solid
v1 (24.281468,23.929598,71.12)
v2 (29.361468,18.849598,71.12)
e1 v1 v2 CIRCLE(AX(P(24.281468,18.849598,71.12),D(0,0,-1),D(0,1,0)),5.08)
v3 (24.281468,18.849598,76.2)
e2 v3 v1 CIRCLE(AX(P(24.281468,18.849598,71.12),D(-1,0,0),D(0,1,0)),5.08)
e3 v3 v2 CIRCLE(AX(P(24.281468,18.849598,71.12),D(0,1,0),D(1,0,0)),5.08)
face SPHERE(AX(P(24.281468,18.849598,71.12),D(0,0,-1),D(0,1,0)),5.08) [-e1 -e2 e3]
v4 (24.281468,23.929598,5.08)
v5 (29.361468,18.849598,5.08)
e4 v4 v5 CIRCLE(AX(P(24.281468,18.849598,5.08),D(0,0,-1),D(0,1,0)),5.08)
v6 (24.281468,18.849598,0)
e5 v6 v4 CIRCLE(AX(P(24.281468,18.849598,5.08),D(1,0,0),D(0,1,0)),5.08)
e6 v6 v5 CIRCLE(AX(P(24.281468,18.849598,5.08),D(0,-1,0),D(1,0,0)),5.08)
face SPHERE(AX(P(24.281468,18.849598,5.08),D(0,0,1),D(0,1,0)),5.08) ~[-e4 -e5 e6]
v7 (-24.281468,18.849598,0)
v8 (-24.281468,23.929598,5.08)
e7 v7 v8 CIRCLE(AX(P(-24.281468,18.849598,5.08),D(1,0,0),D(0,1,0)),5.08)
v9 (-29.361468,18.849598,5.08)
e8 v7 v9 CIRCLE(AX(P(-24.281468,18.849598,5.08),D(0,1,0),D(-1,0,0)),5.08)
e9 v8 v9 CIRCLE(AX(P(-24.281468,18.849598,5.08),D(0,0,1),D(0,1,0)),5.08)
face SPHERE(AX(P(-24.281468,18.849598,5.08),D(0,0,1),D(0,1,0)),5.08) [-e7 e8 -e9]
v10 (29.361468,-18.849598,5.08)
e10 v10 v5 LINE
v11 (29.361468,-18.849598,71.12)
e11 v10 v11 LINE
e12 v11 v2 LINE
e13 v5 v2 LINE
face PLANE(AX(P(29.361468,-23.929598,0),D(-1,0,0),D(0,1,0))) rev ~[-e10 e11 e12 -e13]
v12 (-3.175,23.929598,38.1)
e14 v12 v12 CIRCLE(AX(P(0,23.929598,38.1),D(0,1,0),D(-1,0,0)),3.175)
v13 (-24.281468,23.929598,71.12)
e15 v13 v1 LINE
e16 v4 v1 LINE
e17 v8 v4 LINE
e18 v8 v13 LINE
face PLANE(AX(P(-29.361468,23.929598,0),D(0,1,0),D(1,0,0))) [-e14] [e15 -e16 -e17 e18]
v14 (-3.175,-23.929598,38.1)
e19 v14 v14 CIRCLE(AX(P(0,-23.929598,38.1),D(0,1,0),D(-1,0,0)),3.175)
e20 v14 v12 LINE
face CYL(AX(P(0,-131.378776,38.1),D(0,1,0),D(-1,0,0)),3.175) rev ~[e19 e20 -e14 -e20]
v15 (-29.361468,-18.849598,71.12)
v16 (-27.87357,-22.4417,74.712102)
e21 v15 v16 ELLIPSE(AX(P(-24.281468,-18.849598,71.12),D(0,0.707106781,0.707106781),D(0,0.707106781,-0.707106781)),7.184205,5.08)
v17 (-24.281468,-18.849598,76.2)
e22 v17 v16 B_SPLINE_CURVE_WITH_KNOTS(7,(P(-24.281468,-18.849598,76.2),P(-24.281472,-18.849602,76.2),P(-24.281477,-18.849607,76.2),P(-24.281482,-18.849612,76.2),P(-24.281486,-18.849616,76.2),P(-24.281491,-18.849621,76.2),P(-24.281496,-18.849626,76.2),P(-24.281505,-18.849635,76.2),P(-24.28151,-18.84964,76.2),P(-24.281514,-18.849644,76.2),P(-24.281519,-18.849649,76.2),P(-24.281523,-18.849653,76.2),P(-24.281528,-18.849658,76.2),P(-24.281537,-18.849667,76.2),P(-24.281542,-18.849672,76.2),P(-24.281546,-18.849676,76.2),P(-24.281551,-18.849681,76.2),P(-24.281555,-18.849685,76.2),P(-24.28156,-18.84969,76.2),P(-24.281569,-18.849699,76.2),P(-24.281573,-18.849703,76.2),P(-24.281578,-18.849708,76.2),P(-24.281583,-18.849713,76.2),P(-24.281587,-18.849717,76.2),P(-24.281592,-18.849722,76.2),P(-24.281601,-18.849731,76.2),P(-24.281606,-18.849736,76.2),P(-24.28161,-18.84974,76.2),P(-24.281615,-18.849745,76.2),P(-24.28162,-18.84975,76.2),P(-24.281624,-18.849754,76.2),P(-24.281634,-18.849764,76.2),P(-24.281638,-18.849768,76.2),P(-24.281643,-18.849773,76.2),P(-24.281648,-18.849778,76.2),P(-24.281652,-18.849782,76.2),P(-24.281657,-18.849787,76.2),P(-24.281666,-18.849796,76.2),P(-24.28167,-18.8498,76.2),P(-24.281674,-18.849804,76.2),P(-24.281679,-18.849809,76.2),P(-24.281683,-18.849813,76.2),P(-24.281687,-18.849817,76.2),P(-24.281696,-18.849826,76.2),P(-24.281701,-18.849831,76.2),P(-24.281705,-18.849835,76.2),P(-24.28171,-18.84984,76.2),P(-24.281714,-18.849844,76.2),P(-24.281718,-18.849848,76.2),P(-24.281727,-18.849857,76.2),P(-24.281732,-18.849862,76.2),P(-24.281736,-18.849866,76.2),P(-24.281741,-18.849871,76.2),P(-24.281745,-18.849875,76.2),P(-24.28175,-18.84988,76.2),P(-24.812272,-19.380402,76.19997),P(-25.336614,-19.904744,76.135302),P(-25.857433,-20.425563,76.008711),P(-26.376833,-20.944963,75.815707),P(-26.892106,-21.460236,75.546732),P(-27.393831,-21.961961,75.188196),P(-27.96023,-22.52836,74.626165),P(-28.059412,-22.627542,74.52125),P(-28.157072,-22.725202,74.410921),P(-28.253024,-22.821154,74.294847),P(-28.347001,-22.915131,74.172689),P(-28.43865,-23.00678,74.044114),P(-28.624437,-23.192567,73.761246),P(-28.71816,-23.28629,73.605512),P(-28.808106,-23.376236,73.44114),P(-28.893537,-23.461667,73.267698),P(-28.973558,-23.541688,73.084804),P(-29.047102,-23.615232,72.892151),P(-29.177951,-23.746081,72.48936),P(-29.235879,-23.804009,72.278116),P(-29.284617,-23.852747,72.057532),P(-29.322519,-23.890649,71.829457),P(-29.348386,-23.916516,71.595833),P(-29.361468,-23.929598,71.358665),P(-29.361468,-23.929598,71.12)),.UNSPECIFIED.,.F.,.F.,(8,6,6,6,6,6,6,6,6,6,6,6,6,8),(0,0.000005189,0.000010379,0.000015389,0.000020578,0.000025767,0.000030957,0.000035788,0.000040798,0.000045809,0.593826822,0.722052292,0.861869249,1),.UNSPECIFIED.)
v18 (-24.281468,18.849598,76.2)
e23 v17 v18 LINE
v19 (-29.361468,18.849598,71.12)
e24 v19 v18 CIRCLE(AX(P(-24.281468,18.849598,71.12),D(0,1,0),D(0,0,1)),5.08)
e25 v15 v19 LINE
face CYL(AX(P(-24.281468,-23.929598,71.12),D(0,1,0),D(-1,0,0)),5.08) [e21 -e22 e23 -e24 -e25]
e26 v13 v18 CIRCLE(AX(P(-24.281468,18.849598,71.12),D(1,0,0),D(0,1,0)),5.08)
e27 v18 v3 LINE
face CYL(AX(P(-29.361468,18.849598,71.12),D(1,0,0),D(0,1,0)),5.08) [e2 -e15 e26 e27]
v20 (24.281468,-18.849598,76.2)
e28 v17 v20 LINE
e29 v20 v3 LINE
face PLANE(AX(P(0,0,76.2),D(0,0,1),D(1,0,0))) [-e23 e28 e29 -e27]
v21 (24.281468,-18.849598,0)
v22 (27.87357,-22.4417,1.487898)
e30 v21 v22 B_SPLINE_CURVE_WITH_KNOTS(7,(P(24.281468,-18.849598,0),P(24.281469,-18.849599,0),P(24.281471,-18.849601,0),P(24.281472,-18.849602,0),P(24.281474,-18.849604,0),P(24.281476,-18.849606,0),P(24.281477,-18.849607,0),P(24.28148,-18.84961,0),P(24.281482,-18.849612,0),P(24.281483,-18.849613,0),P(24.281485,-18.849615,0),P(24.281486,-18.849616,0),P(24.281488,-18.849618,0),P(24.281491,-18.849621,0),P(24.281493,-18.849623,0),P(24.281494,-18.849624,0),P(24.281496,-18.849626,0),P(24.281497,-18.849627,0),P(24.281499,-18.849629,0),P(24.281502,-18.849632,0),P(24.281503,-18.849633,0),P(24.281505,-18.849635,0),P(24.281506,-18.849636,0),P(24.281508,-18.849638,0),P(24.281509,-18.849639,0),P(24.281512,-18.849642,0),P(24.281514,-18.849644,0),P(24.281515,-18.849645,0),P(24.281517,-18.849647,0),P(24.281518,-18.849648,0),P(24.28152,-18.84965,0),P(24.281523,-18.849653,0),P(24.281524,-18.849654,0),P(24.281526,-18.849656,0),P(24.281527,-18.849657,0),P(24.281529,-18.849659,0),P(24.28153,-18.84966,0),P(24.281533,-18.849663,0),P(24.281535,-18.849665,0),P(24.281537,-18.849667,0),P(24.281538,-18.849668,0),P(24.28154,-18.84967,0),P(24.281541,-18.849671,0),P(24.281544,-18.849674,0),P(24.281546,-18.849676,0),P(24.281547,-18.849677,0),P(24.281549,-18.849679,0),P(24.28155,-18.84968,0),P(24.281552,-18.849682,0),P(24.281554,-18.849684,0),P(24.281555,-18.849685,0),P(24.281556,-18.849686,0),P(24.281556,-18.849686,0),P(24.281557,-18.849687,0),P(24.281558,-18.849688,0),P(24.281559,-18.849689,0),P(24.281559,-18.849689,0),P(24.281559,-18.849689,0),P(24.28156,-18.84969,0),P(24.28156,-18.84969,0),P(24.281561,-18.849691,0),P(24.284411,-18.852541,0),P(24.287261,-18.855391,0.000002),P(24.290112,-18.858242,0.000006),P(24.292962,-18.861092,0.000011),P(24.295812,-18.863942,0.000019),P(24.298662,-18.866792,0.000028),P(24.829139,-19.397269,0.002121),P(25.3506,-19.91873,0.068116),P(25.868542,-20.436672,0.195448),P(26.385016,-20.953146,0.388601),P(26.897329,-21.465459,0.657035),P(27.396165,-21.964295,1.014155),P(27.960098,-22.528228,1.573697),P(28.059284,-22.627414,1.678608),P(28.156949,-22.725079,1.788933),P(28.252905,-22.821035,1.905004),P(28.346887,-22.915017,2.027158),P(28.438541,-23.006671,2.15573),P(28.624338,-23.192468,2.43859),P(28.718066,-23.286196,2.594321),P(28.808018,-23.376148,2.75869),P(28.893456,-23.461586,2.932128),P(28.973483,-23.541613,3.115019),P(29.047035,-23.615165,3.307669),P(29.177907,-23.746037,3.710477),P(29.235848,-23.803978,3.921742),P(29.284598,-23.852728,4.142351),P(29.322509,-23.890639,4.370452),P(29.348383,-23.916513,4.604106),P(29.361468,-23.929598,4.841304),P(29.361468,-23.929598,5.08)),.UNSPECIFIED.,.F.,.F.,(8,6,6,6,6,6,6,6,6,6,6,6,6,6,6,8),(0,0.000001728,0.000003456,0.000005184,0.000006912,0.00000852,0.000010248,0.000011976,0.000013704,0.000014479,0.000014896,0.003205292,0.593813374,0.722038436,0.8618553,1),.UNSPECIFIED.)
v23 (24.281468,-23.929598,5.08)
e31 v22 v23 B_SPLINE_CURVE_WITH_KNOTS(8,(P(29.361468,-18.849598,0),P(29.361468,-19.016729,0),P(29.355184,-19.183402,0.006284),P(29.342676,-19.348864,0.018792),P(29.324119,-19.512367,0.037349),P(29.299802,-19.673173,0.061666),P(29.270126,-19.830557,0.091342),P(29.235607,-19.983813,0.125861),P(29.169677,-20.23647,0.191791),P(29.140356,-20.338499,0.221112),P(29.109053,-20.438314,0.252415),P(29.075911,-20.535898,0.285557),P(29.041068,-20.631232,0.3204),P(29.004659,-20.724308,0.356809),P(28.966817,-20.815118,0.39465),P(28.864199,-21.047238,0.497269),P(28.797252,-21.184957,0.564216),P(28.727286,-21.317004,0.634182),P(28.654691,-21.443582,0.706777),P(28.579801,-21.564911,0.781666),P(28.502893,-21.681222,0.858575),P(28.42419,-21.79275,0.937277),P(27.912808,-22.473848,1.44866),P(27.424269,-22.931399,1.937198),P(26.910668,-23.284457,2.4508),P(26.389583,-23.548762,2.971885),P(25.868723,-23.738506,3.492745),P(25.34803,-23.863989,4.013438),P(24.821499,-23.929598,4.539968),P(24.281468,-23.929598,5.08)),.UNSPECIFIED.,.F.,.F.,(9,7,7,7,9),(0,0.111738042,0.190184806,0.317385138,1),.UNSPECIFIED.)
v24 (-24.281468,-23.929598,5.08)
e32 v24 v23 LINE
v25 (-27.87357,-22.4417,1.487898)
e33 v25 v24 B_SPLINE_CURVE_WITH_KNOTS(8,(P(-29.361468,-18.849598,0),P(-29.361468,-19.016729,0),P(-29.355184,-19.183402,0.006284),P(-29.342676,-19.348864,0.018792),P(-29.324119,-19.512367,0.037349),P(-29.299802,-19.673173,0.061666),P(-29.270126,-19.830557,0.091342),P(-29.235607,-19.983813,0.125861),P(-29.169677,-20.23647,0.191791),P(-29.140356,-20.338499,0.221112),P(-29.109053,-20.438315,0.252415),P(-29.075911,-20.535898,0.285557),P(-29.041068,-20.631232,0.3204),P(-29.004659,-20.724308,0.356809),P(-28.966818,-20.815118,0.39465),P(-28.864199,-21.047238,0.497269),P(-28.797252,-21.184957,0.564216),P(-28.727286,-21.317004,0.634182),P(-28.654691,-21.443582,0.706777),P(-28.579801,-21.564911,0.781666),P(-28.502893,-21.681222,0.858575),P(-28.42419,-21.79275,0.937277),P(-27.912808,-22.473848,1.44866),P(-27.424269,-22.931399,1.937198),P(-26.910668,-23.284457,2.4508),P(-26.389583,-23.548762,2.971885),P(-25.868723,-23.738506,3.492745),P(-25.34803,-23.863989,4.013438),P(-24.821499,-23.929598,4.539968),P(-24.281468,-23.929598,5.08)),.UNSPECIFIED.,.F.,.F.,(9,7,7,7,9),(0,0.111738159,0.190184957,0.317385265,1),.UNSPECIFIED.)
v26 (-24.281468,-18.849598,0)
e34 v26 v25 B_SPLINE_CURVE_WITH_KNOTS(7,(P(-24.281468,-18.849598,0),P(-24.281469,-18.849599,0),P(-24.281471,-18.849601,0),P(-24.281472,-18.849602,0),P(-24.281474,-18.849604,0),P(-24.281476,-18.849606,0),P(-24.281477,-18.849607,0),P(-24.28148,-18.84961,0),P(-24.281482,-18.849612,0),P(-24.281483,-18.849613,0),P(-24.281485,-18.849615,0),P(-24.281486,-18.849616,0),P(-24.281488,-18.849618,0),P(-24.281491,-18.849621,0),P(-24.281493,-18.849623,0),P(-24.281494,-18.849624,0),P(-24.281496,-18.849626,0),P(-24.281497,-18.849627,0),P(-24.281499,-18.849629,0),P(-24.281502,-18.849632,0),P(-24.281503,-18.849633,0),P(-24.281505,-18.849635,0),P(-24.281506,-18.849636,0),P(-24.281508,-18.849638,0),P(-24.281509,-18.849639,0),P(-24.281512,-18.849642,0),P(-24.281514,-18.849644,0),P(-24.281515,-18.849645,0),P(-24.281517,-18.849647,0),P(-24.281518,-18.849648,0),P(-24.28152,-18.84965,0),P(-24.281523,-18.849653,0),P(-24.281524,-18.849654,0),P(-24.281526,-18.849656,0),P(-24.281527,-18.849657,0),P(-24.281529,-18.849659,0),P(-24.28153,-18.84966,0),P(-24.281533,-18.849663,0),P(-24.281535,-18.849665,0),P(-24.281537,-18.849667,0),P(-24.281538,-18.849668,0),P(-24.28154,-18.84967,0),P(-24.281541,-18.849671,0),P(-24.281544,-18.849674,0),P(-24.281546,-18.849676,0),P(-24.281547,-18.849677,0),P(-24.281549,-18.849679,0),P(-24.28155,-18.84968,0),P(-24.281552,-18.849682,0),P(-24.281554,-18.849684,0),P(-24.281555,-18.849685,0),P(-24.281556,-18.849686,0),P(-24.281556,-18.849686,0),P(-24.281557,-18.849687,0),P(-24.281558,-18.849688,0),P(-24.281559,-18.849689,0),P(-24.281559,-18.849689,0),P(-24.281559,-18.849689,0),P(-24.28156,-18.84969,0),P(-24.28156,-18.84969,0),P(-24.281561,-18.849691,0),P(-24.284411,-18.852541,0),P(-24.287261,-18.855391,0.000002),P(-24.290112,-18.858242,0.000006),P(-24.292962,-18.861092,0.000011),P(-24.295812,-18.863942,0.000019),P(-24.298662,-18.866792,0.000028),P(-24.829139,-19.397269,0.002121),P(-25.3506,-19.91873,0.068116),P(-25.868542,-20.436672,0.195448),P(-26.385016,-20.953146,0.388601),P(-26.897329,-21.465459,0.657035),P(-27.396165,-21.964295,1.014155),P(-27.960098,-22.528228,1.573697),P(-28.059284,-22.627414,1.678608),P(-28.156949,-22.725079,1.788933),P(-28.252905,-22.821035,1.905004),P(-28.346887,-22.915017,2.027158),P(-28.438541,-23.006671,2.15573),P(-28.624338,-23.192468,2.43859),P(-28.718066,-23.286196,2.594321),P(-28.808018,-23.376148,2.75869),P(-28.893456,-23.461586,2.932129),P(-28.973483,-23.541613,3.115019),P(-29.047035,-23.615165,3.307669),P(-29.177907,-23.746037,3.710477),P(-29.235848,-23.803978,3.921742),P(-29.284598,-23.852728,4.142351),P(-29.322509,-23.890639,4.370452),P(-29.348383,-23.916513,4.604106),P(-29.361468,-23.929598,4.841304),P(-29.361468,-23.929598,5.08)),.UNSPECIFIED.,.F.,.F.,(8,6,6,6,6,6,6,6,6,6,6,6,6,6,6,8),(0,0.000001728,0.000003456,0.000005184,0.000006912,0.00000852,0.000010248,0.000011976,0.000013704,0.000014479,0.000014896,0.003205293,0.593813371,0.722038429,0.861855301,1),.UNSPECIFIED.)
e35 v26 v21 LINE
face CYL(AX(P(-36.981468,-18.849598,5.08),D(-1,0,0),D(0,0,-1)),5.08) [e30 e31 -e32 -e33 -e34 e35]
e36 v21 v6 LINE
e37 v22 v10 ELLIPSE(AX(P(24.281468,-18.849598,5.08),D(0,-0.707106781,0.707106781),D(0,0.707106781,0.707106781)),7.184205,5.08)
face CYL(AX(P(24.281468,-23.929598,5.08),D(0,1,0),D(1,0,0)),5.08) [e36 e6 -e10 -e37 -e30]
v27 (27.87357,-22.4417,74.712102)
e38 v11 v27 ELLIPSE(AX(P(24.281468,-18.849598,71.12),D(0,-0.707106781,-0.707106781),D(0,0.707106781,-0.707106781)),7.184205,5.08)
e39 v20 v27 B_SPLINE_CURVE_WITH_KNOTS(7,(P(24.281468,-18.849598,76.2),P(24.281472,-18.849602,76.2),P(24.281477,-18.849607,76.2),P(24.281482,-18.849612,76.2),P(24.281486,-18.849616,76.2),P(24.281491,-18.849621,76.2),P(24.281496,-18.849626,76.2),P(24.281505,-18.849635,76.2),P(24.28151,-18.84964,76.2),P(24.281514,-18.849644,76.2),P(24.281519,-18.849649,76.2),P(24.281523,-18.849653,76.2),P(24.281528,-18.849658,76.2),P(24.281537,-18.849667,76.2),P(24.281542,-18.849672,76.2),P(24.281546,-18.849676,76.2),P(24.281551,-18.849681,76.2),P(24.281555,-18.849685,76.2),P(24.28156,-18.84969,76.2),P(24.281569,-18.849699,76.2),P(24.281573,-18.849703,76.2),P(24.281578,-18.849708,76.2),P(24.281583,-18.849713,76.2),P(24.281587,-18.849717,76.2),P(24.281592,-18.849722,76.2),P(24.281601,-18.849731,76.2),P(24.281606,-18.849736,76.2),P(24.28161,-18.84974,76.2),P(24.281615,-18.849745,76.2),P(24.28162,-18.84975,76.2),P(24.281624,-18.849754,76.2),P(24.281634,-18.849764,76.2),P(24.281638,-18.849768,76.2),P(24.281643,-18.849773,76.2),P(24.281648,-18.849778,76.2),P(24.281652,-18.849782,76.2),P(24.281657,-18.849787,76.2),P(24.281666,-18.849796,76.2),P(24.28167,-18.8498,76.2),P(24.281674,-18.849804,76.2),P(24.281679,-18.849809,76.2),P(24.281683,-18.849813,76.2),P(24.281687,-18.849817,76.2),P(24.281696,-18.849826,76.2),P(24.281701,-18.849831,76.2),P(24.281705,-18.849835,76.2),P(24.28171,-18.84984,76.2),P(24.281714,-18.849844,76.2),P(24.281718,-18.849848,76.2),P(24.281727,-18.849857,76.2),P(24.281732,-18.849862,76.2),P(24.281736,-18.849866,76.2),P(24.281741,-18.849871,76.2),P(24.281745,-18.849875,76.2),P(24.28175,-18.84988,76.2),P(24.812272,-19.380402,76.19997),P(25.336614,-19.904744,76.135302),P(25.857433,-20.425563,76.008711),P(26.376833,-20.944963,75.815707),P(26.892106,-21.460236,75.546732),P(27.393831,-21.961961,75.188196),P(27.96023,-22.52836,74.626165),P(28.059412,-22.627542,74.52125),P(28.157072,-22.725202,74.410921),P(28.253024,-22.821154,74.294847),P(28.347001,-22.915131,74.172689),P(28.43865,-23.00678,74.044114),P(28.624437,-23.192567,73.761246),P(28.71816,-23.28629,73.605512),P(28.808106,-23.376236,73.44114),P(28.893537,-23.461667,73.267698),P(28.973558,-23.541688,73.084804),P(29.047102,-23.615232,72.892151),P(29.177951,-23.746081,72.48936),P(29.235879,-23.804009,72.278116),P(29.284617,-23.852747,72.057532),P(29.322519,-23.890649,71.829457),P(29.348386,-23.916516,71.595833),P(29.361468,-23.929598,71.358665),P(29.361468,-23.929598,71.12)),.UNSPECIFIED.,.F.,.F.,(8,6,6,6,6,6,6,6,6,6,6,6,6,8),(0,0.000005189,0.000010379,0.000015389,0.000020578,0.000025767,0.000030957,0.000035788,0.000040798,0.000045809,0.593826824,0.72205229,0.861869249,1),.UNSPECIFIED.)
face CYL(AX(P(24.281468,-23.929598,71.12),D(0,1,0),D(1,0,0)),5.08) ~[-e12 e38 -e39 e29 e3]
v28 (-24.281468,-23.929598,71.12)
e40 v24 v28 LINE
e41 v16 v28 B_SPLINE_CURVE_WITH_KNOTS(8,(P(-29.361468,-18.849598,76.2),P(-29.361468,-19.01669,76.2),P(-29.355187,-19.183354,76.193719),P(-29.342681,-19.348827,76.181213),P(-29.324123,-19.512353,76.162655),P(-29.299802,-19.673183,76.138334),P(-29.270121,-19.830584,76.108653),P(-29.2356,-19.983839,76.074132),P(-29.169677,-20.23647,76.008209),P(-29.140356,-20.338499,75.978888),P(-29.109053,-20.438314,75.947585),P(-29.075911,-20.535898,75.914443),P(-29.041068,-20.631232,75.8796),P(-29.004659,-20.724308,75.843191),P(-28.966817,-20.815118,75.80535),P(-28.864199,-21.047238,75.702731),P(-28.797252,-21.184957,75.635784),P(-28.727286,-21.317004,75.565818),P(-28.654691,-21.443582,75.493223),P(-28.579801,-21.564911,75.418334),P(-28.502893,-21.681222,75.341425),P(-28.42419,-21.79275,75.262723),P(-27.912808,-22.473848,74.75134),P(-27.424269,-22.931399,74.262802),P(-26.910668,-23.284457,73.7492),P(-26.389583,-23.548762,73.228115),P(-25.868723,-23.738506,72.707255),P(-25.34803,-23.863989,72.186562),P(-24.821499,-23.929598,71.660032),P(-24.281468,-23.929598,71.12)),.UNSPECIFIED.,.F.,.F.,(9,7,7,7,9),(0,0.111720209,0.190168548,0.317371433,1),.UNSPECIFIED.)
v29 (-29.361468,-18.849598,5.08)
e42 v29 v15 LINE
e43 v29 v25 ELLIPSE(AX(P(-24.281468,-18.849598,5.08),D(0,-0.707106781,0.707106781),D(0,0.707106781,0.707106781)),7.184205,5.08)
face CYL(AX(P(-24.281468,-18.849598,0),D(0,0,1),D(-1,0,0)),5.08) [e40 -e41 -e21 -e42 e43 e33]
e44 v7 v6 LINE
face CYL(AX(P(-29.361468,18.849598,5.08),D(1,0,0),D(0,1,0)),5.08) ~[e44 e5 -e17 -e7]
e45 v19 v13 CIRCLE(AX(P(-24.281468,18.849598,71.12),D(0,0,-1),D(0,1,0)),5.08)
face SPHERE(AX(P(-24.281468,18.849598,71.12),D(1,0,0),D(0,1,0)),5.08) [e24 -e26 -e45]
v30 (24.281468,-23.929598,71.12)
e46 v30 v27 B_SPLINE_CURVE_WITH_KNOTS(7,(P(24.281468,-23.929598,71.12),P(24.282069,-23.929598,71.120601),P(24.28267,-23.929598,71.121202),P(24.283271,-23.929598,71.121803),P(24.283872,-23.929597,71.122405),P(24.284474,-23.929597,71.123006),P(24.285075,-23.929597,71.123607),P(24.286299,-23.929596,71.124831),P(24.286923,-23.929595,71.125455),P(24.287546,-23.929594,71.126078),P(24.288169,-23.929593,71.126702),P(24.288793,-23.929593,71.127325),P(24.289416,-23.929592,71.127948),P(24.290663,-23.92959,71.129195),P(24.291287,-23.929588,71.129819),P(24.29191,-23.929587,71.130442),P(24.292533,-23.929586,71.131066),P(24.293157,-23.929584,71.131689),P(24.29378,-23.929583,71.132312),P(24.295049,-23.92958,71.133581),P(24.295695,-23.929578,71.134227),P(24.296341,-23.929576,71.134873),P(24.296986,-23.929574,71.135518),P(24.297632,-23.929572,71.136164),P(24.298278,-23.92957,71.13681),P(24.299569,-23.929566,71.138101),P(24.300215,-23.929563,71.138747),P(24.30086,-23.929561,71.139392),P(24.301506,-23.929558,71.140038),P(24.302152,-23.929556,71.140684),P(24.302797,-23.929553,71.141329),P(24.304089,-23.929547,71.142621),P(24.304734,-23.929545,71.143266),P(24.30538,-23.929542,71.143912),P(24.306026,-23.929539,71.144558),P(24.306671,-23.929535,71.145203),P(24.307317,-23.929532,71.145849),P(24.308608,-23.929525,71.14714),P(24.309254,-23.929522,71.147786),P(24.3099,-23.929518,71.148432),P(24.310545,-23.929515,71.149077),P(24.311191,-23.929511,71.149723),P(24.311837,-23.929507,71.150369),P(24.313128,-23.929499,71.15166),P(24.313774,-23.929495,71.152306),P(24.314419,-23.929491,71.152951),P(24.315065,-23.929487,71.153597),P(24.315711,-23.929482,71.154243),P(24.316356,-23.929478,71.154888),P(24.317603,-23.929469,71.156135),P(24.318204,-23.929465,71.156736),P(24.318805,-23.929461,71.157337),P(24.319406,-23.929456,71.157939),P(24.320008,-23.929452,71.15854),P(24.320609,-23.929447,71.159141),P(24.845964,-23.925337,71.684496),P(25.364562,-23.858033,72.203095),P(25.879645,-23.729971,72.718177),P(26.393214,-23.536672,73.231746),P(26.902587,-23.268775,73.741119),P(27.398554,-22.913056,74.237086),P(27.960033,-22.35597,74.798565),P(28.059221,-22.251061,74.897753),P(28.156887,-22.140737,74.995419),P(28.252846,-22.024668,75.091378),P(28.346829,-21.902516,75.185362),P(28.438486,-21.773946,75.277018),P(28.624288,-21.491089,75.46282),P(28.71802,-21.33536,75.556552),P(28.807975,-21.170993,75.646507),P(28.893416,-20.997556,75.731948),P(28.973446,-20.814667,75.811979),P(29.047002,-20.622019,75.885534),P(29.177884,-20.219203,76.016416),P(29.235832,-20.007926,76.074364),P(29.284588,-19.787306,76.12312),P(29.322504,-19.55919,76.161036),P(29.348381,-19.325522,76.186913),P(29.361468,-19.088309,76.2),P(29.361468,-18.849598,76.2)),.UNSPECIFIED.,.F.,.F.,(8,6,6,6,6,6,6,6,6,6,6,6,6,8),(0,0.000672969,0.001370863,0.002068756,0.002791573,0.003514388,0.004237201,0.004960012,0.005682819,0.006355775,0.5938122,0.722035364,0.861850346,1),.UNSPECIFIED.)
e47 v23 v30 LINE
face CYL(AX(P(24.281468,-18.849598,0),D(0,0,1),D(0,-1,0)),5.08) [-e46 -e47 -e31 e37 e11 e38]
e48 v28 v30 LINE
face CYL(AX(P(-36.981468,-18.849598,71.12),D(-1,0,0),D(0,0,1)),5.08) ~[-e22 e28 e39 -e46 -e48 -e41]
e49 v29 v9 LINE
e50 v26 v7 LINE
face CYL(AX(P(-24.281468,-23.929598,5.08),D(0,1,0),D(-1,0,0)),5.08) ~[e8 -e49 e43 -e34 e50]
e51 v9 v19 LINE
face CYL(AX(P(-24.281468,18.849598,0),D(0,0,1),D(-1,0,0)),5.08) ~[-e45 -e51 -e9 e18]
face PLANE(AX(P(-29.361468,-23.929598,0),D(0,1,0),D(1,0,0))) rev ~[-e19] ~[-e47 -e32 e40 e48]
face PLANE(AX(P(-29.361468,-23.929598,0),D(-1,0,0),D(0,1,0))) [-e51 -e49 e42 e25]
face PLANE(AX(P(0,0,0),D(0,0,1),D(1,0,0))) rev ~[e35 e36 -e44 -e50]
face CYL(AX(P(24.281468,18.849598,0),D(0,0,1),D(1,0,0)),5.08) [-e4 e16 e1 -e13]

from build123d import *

# Parameters (mm, degrees)
F0_W        = 58.722935617
F0_H        = 47.8591956198
F1_DEPTH    = 76.2
F2_R        = 5.08
F3_T1_DEPTH = 73.962935617
F5_D        = 6.35


# Not quite as in the source:
# - a fillet or chamfer that OpenCascade refuses, or shapes differently, is made with other operations: its cross-section is extruded or revolved along the edge and cut away or added


with BuildPart() as f1:
    # F0 (on Top) → F1 (new body)
    with BuildSketch(Plane.XY):
        Rectangle(F0_W, F0_H)
    extrude(amount=F1_DEPTH)

    # F2
    f2_edges = [f1.edges().sort_by_distance(p)[0] for p in [
        (29.361468, 23.929598, 38.1),
        (0, 23.929598, 76.2),
        (-29.361468, 23.929598, 38.1),
        (0, 23.929598, 0),
        (29.361468, 0, 76.2),
        (29.361468, -23.929598, 38.1),
        (29.361468, 0, 0),
        (-29.361468, 0, 76.2),
        (-29.361468, -23.929598, 38.1),
        (-29.361468, 0, 0),
    ]]
    fillet(f2_edges, radius=F2_R)

    # F3: fillet of radius 5.08 on 4 edges, made by hand

    # F3_s2 → F3_t1 (cut)
    with BuildSketch(Plane.YZ.offset(-36.9814678085)):
        with BuildLine():
            ThreePointArc((-18.8495978099, 0), (-22.4417002583, 1.4878975516), (-23.9295978099, 5.08))
            Line((-23.9295978099, 5.08), (-23.9295978099, 0))
            Line((-23.9295978099, 0), (-18.8495978099, 0))
        make_face()
        with BuildLine():
            ThreePointArc((-18.8495978099, 76.2), (-22.4417002583, 74.7121024484), (-23.9295978099, 71.12))
            Line((-23.9295978099, 71.12), (-23.9295978099, 76.2))
            Line((-23.9295978099, 76.2), (-18.8495978099, 76.2))
        make_face()
    extrude(amount=F3_T1_DEPTH, mode=Mode.SUBTRACT)

    # F5 (through all)
    with Locations(Plane.XZ.offset(23.9295978099)):
        with Locations((0, 38.1)):
            Hole(F5_D / 2)


solid = f1.part
